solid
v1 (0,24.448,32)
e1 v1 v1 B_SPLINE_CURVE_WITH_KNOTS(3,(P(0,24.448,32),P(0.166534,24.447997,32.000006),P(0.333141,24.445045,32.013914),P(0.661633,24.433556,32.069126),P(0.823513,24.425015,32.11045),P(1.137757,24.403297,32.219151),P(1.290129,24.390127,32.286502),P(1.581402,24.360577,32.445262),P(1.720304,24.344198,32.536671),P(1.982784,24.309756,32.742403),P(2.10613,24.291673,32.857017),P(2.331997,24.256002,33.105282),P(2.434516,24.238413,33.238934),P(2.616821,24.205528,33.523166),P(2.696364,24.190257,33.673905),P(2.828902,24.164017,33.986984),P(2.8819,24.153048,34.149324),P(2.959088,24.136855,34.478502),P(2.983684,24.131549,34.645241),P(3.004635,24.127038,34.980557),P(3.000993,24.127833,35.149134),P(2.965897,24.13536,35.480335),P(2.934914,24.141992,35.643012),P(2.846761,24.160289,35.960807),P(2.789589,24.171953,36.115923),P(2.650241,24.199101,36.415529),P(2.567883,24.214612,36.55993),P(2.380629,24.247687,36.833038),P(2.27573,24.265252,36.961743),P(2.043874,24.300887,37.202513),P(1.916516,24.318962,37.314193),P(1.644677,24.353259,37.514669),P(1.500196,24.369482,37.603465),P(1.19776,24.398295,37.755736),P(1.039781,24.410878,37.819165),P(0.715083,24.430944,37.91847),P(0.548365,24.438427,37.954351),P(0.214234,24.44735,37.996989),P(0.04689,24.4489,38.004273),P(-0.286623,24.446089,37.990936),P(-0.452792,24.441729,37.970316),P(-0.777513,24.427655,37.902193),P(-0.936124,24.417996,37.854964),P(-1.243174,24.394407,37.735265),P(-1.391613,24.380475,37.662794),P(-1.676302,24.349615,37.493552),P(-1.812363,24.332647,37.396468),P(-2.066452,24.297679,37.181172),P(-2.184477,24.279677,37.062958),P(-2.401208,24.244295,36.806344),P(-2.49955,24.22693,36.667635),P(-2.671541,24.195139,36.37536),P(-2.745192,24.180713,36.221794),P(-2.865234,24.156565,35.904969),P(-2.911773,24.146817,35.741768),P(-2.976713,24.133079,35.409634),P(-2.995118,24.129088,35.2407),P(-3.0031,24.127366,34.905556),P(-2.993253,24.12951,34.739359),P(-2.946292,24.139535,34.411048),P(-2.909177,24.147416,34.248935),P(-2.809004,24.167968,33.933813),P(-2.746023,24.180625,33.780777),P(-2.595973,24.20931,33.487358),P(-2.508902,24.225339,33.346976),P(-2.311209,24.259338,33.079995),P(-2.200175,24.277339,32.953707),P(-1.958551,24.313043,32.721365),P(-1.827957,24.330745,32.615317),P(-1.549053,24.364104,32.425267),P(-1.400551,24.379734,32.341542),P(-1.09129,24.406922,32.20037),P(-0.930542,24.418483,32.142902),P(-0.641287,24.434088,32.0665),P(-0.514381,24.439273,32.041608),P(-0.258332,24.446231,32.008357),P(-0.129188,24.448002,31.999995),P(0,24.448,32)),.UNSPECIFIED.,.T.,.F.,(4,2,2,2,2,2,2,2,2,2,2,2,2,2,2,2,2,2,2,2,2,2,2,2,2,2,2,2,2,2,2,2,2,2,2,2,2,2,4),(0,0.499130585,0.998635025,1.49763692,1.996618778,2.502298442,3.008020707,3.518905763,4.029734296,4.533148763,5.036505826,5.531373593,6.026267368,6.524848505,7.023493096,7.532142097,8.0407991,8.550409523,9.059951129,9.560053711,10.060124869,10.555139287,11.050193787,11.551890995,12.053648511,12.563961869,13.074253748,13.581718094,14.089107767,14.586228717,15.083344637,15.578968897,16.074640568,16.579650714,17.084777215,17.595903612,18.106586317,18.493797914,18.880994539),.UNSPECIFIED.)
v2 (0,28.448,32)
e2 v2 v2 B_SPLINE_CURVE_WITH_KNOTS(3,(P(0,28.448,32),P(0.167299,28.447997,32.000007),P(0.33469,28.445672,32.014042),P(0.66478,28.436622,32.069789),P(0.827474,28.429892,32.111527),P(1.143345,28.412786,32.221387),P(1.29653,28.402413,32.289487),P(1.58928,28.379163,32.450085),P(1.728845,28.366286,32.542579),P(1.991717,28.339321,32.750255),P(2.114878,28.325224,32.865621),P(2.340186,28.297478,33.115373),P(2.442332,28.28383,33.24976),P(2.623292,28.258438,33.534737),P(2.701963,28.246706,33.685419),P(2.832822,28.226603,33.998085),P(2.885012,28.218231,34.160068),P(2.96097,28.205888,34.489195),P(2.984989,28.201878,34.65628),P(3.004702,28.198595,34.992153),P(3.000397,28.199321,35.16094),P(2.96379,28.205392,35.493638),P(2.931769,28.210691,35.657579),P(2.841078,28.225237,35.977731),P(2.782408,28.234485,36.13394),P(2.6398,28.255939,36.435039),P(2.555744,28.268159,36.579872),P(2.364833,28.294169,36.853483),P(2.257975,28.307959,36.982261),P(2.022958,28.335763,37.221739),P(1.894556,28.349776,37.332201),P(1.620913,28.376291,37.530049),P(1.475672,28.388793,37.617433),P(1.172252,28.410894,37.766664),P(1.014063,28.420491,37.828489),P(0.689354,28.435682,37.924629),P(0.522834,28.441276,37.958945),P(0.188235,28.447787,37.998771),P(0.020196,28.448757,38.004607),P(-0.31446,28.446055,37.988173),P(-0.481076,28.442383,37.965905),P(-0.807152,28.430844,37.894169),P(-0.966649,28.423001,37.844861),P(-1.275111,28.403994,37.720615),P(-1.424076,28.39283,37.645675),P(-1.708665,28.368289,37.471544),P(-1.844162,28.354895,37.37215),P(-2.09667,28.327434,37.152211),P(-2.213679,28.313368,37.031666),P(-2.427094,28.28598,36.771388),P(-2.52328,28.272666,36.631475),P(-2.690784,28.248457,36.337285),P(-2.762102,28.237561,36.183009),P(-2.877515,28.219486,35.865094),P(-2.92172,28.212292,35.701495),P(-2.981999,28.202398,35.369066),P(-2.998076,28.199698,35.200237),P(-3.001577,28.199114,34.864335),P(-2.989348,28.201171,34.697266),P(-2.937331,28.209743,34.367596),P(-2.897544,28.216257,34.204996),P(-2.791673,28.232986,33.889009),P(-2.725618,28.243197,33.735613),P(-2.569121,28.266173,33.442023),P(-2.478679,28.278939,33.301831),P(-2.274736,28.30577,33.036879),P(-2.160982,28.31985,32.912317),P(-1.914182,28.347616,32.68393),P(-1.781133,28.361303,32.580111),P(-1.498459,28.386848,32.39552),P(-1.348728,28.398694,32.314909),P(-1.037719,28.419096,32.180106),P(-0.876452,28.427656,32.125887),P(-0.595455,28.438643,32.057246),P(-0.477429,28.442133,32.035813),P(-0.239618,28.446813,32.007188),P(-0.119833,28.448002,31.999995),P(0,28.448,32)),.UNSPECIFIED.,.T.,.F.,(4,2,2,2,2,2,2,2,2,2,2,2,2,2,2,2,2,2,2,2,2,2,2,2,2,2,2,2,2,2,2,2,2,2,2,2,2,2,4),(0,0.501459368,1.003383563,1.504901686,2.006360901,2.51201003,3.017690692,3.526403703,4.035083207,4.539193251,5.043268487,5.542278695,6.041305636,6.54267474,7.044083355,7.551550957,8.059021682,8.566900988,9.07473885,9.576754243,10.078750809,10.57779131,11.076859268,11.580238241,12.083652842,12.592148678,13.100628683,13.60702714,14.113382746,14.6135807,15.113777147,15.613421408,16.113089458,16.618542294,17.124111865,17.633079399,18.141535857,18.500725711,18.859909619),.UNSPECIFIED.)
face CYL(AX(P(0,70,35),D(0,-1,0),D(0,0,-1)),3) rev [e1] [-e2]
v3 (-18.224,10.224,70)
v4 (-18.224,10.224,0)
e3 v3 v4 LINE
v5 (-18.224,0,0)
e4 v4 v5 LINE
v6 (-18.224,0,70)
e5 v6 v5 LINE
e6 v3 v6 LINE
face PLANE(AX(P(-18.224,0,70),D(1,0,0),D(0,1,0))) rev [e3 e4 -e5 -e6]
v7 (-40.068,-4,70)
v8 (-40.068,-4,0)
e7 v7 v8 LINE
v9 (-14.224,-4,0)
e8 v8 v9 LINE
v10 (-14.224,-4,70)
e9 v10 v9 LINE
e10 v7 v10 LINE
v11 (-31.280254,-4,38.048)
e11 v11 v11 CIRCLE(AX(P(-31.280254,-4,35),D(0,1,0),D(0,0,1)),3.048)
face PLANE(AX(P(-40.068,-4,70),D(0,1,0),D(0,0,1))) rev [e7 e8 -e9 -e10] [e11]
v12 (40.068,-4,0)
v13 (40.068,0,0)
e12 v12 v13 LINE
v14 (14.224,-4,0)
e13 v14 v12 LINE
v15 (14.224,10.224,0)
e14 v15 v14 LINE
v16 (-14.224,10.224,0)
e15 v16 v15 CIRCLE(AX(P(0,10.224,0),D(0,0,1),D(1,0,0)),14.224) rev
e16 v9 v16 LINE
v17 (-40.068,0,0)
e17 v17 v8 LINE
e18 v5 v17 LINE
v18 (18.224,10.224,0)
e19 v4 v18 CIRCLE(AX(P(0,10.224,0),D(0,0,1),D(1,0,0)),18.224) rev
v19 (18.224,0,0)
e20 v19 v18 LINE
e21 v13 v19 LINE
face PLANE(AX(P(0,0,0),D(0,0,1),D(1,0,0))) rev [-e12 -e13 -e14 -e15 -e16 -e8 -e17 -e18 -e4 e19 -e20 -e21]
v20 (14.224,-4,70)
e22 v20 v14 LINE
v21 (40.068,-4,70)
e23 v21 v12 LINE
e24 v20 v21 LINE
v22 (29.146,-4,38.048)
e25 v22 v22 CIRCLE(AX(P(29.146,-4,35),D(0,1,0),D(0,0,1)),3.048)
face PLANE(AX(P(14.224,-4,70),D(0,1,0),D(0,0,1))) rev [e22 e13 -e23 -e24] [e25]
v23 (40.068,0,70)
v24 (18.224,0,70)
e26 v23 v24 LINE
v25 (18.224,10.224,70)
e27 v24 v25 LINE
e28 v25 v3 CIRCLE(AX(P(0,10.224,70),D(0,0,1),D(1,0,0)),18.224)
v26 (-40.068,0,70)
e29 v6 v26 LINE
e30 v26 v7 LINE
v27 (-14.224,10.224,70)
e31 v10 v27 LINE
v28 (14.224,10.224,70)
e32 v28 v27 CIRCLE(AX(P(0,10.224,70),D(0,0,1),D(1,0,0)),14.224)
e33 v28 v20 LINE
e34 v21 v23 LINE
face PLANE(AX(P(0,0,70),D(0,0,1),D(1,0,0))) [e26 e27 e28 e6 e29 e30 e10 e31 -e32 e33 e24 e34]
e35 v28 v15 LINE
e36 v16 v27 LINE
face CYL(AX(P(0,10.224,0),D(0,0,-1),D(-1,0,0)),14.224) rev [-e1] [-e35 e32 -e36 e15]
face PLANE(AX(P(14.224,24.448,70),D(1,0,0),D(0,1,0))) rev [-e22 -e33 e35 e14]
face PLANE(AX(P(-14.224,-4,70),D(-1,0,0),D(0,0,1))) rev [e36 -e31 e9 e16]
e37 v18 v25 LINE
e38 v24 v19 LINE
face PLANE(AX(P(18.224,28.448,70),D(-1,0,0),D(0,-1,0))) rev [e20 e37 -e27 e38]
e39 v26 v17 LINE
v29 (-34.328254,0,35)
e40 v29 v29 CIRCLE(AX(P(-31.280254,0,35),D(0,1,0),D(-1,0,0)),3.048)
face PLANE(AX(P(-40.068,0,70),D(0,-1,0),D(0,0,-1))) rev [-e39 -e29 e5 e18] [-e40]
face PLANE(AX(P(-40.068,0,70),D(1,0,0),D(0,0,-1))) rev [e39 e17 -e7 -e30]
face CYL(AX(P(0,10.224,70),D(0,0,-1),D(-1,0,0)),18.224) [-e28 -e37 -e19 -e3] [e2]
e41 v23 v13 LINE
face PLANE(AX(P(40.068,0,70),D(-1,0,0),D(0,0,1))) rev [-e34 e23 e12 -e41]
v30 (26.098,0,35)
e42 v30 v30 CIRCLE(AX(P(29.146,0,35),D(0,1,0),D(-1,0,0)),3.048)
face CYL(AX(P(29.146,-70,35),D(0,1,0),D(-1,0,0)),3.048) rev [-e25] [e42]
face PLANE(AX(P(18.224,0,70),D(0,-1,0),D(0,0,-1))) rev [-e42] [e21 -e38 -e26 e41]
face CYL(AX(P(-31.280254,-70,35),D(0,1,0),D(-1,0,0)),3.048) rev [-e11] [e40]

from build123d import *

# Parameters (mm, degrees)
BOSS_EXTRUDE1_DEPTH = 70
SKETCH2_R           = 3.048
CUT_EXTRUDE1_DEPTH  = 70
FILLET1_R           = 14.224
FILLET2_RADIUS      = 18.224
FILLET2_LENGTH      = 70
SKETCH3_R           = 3
CUT_EXTRUDE2_DEPTH  = 70


with BuildPart() as part:
    # Sketch1 → Boss-Extrude1 (new body)
    with BuildSketch(Plane.XY):
        Polygon((-40.068, 0), (-18.224, 0), (-18.224, 28.448), (18.224, 28.448), (18.224, 0), (40.068, 0), (40.068, -4), (14.224, -4), (14.224, 24.448), (-14.224, 24.448), (-14.224, -4), (-40.068, -4), align=None)
    extrude(amount=BOSS_EXTRUDE1_DEPTH)

    # Sketch2 → Cut-Extrude1 (cut)
    with BuildSketch(Plane(origin=(0, 0, 0), x_dir=(1, 0, 0), z_dir=(0, 1, 0))):
        with Locations(Location((-31.280253866, -35, 0), (0, 0, 180))):
            Circle(SKETCH2_R)
        with BuildLine():
            ThreePointArc((32.194, -35), (31.301261469, -32.844738531), (29.146, -31.952))
            Line((29.146, -31.952), (29.146, -38.048))
            ThreePointArc((29.146, -38.048), (31.301261469, -37.155261469), (32.194, -35))
        make_face()
        with BuildLine():
            Line((29.146, -38.048), (29.146, -31.952))
            ThreePointArc((29.146, -31.952), (26.098, -35), (29.146, -38.048))
        make_face()
    extrude(amount=-CUT_EXTRUDE1_DEPTH, mode=Mode.SUBTRACT)

    # Fillet1
    fillet1_edges = [part.edges().sort_by_distance(p)[0] for p in [
        (14.224, 24.448, 35),
        (-14.224, 24.448, 35),
    ]]
    fillet(fillet1_edges, radius=FILLET1_R - 0.0001)  # a hair under: the kernel refuses the full size

    # Fillet2: full round fillet: the end face becomes a half cylinder, R = half its width
    fillet2_face = Plane((0, 28.448, 35), x_dir=(0, 0, 1), z_dir=(0, 1, 0))  # on the end face: x along it, z out of the body
    fillet2_slab = fillet2_face.offset(-FILLET2_RADIUS / 2) * Box(FILLET2_LENGTH, 2 * FILLET2_RADIUS, FILLET2_RADIUS, mode=Mode.PRIVATE)  # the body's end, R deep
    fillet2_round = Plane((0, 10.224, 35), x_dir=(0, 1, 0), z_dir=(0, 0, 1)) * Cylinder(FILLET2_RADIUS, FILLET2_LENGTH, mode=Mode.PRIVATE)  # its axis R under the face
    add(fillet2_slab - fillet2_round, mode=Mode.SUBTRACT)

    # Sketch3 → Cut-Extrude2 (cut)
    with BuildSketch(Plane(origin=(0, 0, 0), x_dir=(1, 0, 0), z_dir=(0, 1, 0))):
        with Locations(Location((0, -35, 0), (0, 0, 90))):
            Circle(SKETCH3_R)
    extrude(amount=CUT_EXTRUDE2_DEPTH, mode=Mode.SUBTRACT)


solid = part.part
